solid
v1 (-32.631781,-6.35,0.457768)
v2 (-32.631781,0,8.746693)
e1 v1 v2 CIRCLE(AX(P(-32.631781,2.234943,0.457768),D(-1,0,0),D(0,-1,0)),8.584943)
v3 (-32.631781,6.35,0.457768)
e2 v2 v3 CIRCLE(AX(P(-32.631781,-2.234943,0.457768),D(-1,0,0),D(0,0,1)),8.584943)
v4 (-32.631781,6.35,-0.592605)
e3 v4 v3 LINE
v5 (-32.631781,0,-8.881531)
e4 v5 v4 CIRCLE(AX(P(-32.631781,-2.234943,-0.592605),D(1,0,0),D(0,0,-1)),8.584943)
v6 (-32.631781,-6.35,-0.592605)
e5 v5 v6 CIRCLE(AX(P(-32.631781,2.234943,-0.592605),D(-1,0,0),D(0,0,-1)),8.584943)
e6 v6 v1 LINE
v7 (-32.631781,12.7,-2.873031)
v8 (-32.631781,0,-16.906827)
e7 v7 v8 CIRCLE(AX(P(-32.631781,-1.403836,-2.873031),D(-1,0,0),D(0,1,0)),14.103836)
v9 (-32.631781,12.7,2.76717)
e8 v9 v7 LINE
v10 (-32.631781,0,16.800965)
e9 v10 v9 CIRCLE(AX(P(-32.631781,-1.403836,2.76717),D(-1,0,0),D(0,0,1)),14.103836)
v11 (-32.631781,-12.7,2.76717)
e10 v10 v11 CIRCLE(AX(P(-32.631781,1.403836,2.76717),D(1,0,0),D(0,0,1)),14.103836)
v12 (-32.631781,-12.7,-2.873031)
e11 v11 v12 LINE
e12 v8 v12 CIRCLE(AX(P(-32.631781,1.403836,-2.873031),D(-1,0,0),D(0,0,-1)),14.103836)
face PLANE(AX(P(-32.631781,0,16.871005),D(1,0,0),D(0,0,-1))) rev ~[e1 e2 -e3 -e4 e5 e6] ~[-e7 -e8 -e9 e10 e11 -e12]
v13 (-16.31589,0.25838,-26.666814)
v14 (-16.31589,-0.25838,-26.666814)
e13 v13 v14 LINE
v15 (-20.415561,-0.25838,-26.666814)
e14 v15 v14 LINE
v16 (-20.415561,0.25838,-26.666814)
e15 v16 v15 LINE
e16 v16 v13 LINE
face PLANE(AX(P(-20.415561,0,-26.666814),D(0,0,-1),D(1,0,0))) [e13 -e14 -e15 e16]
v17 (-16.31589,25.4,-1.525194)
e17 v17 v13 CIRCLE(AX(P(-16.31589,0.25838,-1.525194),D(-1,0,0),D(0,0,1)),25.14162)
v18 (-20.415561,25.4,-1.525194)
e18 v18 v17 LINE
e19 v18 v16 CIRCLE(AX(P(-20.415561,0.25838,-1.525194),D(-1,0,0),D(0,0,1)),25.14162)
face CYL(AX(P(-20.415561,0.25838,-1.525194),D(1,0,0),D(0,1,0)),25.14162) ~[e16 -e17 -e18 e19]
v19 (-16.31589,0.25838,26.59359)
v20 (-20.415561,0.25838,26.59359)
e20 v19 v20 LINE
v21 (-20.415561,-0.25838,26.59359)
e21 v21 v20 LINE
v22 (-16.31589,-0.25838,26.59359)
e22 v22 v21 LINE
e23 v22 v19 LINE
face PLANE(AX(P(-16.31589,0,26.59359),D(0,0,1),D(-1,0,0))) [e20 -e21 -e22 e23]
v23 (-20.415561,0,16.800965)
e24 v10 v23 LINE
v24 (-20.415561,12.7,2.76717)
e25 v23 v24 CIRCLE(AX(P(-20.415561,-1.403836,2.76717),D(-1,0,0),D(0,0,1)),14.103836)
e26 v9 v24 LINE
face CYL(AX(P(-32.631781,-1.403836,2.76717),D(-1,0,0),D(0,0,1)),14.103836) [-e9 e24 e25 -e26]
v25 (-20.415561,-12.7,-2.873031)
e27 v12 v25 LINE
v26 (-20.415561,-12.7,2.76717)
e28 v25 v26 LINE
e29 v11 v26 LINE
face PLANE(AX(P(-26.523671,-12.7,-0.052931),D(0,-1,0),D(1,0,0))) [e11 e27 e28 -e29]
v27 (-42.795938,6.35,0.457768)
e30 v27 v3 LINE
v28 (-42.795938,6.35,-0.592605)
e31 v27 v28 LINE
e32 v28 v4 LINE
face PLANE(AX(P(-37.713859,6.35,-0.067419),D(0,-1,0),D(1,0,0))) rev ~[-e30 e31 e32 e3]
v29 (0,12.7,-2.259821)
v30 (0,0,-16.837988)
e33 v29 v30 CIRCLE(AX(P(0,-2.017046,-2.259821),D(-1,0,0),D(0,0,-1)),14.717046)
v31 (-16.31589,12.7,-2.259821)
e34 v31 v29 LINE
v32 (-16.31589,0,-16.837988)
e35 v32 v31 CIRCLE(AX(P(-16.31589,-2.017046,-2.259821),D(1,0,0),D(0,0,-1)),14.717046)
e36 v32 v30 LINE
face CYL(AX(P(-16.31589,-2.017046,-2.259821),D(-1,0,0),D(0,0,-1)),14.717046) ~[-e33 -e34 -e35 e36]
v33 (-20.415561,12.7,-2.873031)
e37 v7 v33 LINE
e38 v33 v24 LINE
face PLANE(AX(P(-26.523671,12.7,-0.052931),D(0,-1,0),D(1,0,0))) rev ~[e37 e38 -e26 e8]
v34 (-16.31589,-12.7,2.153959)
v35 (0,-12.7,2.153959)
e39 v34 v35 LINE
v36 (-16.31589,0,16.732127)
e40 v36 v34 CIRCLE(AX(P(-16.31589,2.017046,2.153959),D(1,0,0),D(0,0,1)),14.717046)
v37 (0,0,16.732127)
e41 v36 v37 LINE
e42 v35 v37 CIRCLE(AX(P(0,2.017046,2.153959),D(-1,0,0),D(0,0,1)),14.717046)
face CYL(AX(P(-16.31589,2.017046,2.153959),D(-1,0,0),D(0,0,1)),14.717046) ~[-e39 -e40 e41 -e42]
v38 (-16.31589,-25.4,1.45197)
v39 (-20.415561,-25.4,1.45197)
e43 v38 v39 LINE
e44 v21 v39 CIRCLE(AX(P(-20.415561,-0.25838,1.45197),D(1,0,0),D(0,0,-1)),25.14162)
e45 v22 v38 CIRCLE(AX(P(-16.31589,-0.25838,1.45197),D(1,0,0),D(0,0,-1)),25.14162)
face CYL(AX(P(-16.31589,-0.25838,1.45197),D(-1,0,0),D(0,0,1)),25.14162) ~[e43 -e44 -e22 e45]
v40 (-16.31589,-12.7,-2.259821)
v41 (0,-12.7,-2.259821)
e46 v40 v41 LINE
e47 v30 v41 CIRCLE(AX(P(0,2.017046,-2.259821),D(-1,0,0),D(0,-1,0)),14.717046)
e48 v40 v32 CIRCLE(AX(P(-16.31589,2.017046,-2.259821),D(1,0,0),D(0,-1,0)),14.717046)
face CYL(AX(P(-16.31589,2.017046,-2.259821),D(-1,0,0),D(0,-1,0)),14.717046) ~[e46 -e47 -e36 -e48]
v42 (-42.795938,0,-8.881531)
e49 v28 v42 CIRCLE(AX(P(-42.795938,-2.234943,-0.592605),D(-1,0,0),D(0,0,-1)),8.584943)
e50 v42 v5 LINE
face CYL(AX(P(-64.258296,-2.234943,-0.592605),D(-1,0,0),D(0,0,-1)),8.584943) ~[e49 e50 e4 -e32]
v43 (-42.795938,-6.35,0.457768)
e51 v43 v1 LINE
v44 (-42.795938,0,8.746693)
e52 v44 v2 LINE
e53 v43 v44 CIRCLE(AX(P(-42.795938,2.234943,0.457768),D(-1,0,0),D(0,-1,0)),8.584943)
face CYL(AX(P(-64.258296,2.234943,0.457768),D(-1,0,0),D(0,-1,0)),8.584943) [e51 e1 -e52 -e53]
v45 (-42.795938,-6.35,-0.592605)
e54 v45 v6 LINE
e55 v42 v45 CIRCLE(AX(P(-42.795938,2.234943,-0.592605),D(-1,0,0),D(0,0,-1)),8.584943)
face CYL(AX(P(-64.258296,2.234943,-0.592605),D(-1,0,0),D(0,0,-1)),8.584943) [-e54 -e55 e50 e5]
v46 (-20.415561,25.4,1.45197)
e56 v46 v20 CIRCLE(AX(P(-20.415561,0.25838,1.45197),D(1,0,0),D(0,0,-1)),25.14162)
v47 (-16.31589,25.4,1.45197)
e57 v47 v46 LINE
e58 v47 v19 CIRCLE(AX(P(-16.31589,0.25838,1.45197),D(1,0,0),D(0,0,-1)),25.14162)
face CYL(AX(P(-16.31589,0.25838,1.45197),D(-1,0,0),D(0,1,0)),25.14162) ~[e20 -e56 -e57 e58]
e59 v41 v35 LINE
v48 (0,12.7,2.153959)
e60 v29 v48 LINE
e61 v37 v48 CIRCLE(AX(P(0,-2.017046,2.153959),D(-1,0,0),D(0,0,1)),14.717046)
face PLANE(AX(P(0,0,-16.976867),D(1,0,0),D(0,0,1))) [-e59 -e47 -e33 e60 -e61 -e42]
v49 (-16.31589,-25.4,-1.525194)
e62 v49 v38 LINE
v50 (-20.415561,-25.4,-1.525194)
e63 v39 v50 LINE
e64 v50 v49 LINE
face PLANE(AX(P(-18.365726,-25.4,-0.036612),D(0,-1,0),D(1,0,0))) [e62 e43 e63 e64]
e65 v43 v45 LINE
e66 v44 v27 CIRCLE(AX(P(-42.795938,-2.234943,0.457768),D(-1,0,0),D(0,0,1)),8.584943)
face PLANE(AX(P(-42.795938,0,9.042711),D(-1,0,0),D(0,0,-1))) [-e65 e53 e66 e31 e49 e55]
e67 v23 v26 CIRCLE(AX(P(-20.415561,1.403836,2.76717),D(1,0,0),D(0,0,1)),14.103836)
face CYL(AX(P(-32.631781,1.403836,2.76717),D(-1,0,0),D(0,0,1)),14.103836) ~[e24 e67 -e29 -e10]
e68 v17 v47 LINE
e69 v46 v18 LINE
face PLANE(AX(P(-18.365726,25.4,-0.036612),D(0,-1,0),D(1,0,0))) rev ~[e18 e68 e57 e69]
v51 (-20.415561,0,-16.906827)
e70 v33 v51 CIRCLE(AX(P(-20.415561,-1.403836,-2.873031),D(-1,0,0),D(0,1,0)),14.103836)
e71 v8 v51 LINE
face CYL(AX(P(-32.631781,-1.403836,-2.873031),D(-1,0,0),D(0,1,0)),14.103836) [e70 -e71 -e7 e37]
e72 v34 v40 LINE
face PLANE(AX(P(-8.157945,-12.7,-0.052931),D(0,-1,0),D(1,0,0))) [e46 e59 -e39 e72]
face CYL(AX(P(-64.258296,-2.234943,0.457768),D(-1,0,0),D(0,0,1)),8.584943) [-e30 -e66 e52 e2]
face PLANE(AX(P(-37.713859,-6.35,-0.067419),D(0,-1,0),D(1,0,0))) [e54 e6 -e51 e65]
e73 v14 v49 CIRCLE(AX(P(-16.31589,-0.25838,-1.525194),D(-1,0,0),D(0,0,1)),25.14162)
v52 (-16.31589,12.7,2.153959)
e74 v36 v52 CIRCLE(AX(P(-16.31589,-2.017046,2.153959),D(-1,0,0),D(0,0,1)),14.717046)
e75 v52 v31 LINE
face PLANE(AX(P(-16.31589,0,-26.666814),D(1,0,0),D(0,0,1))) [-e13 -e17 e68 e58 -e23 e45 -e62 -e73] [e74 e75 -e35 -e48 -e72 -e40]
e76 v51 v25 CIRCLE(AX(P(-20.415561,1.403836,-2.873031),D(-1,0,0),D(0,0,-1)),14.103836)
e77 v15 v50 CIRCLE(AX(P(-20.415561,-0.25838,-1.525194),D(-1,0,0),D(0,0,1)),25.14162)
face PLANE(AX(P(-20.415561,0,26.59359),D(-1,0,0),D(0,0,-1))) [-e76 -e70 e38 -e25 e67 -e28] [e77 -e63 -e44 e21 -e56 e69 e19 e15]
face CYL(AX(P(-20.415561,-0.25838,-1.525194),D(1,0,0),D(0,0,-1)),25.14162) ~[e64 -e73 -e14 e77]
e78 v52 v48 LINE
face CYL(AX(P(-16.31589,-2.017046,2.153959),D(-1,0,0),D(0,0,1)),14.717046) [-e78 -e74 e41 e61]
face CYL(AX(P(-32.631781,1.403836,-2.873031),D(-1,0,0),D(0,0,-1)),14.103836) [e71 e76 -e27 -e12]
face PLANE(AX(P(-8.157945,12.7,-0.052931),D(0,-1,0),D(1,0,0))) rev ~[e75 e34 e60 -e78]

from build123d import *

# Parameters (mm, degrees)
F1_DEPTH    = 25.4
F2_DEPTH    = 12.7
F3_DEPTH    = 6.35
F4_T1_DEPTH = 31.6265151256
F5_T1_DEPTH = 12.2162196785
F6_R        = 25.1416200386
F7_T1_DEPTH = 53.1085051667


# Not quite as in the source:
# - a fillet or chamfer that OpenCascade refuses, or shapes differently, is made with other operations: its cross-section is extruded or revolved along the edge and cut away or added


with BuildPart() as f1:
    # F0 (on Front) → F1 (new body, symmetric)
    with BuildSketch(Plane.XZ):
        Polygon((-20.4155612737, 26.5935901552), (-20.4155612737, 16.8710052967), (-20.4155612737, -16.9768668711), (-20.4155612737, -26.6668144614), (-16.3158904761, -26.6668144614), (-16.3158904761, -16.9768668711), (-16.3158904761, 16.8710052967), (-16.3158904761, 26.5935901552), align=None)
    extrude(amount=F1_DEPTH, both=True)

    # F0 (on Front) → F2 (join, symmetric)
    with BuildSketch(Plane.XZ):
        Polygon((-32.6317809522, 16.8710052967), (-32.6317809522, 9.0427109972), (-32.6317809522, -9.1775488108), (-32.6317809522, -16.9768668711), (-20.4155612737, -16.9768668711), (-20.4155612737, 16.8710052967), align=None)
        Polygon((0, 16.8710052967), (-16.3158904761, 16.8710052967), (-16.3158904761, -16.9768668711), (0, -16.9768668711), (0, -9.1775488108), (0, 0), (0, 9.0427109972), align=None)
    extrude(amount=F2_DEPTH, both=True)

    # F0 (on Front) → F3 (join, symmetric)
    with BuildSketch(Plane.XZ):
        Polygon((-32.6317809522, -9.1775488108), (-32.6317809522, 9.0427109972), (-42.7959375083, 9.0427109972), (-42.7959375083, 0), (-42.7959375083, -9.1775488108), align=None)
    extrude(amount=F3_DEPTH, both=True)

    # F4: fillet of radius 8.5849434278 on 4 edges, made by hand

    # F4_s2 → F4_t1 (cut)
    with BuildSketch(Plane.YZ.offset(-64.2582960778)):
        with BuildLine():
            ThreePointArc((-6.35, 0.4577675694), (-3.8355282861, 6.5282392833), (2.2349434278, 9.0427109972))
            Line((2.2349434278, 9.0427109972), (-6.35, 9.0427109972))
            Line((-6.35, 9.0427109972), (-6.35, 0.4577675694))
        make_face()
        with BuildLine():
            ThreePointArc((2.2349434278, -9.1775488108), (-3.8355282861, -6.6630770969), (-6.35, -0.592605383))
            Line((-6.35, -0.592605383), (-6.35, -9.1775488108))
            Line((-6.35, -9.1775488108), (2.2349434278, -9.1775488108))
        make_face()
        with BuildLine():
            ThreePointArc((-2.2349434278, 9.0427109972), (3.8355282861, 6.5282392833), (6.35, 0.4577675694))
            Line((6.35, 0.4577675694), (6.35, 9.0427109972))
            Line((6.35, 9.0427109972), (-2.2349434278, 9.0427109972))
        make_face()
        with BuildLine():
            ThreePointArc((-2.2349434278, -9.1775488108), (3.8355282861, -6.6630770969), (6.35, -0.592605383))
            Line((6.35, -0.592605383), (6.35, -9.1775488108))
            Line((6.35, -9.1775488108), (-2.2349434278, -9.1775488108))
        make_face()
    extrude(amount=F4_T1_DEPTH, mode=Mode.SUBTRACT)

    # F5: fillet of radius 14.1038356314 on 4 edges, made by hand

    # F5_s2 → F5_t1 (cut)
    with BuildSketch(Plane.YZ.offset(-32.6317809522)):
        with BuildLine():
            ThreePointArc((-1.4038356314, 16.8710052967), (8.5690821843, 12.740087481), (12.7, 2.7671696653))
            Line((12.7, 2.7671696653), (12.9820767126, 2.7671696653))
            Line((12.9820767126, 2.7671696653), (12.9820767126, 17.1530820093))
            Line((12.9820767126, 17.1530820093), (-1.4038356314, 17.1530820093))
            Line((-1.4038356314, 17.1530820093), (-1.4038356314, 16.8710052967))
        make_face()
        with BuildLine():
            ThreePointArc((12.7, -2.8730312397), (8.5690821843, -12.8459490554), (-1.4038356314, -16.9768668711))
            Line((-1.4038356314, -16.9768668711), (-1.4038356314, -17.2589435837))
            Line((-1.4038356314, -17.2589435837), (12.9820767126, -17.2589435837))
            Line((12.9820767126, -17.2589435837), (12.9820767126, -2.8730312397))
            Line((12.9820767126, -2.8730312397), (12.7, -2.8730312397))
        make_face()
        with BuildLine():
            ThreePointArc((1.4038356314, 16.8710052967), (-8.5690821843, 12.740087481), (-12.7, 2.7671696653))
            Line((-12.7, 2.7671696653), (-12.9820767126, 2.7671696653))
            Line((-12.9820767126, 2.7671696653), (-12.9820767126, 17.1530820093))
            Line((-12.9820767126, 17.1530820093), (1.4038356314, 17.1530820093))
            Line((1.4038356314, 17.1530820093), (1.4038356314, 16.8710052967))
        make_face()
        with BuildLine():
            ThreePointArc((1.4038356314, -16.9768668711), (-8.5690821843, -12.8459490554), (-12.7, -2.8730312397))
            Line((-12.7, -2.8730312397), (-12.9820767126, -2.8730312397))
            Line((-12.9820767126, -2.8730312397), (-12.9820767126, -17.2589435837))
            Line((-12.9820767126, -17.2589435837), (1.4038356314, -17.2589435837))
            Line((1.4038356314, -17.2589435837), (1.4038356314, -16.9768668711))
        make_face()
    extrude(amount=F5_T1_DEPTH, mode=Mode.SUBTRACT)

    # F6
    f6_edges = [f1.edges().sort_by_distance(p)[0] for p in [
        (-18.365726, -25.4, 26.59359),
        (-18.365726, -25.4, -26.666814),
        (-18.365726, 25.4, 26.59359),
        (-18.365726, 25.4, -26.666814),
    ]]
    fillet(f6_edges, radius=F6_R)

    # F7: fillet of radius 14.7170458762 on 4 edges, made by hand

    # F7_s2 → F7_t1 (cut)
    with BuildSketch(Plane.YZ.offset(-16.3158904761)):
        with BuildLine():
            ThreePointArc((-2.0170458762, 16.8710052967), (8.3894770619, 12.5604823586), (12.7, 2.1539594205))
            Line((12.7, 2.1539594205), (12.7, 16.8710052967))
            Line((12.7, 16.8710052967), (-2.0170458762, 16.8710052967))
        make_face()
        with BuildLine():
            ThreePointArc((-2.0170458762, -16.9768668711), (8.3894770619, -12.666343933), (12.7, -2.2598209949))
            Line((12.7, -2.2598209949), (12.7, -16.9768668711))
            Line((12.7, -16.9768668711), (-2.0170458762, -16.9768668711))
        make_face()
        with BuildLine():
            ThreePointArc((2.0170458762, 16.8710052967), (-8.3894770619, 12.5604823586), (-12.7, 2.1539594205))
            Line((-12.7, 2.1539594205), (-12.7, 16.8710052967))
            Line((-12.7, 16.8710052967), (2.0170458762, 16.8710052967))
        make_face()
        with BuildLine():
            ThreePointArc((-12.7, -2.2598209949), (-8.3894770619, -12.666343933), (2.0170458762, -16.9768668711))
            Line((2.0170458762, -16.9768668711), (-12.7, -16.9768668711))
            Line((-12.7, -16.9768668711), (-12.7, -2.2598209949))
        make_face()
    extrude(amount=F7_T1_DEPTH, mode=Mode.SUBTRACT)


solid = f1.part
